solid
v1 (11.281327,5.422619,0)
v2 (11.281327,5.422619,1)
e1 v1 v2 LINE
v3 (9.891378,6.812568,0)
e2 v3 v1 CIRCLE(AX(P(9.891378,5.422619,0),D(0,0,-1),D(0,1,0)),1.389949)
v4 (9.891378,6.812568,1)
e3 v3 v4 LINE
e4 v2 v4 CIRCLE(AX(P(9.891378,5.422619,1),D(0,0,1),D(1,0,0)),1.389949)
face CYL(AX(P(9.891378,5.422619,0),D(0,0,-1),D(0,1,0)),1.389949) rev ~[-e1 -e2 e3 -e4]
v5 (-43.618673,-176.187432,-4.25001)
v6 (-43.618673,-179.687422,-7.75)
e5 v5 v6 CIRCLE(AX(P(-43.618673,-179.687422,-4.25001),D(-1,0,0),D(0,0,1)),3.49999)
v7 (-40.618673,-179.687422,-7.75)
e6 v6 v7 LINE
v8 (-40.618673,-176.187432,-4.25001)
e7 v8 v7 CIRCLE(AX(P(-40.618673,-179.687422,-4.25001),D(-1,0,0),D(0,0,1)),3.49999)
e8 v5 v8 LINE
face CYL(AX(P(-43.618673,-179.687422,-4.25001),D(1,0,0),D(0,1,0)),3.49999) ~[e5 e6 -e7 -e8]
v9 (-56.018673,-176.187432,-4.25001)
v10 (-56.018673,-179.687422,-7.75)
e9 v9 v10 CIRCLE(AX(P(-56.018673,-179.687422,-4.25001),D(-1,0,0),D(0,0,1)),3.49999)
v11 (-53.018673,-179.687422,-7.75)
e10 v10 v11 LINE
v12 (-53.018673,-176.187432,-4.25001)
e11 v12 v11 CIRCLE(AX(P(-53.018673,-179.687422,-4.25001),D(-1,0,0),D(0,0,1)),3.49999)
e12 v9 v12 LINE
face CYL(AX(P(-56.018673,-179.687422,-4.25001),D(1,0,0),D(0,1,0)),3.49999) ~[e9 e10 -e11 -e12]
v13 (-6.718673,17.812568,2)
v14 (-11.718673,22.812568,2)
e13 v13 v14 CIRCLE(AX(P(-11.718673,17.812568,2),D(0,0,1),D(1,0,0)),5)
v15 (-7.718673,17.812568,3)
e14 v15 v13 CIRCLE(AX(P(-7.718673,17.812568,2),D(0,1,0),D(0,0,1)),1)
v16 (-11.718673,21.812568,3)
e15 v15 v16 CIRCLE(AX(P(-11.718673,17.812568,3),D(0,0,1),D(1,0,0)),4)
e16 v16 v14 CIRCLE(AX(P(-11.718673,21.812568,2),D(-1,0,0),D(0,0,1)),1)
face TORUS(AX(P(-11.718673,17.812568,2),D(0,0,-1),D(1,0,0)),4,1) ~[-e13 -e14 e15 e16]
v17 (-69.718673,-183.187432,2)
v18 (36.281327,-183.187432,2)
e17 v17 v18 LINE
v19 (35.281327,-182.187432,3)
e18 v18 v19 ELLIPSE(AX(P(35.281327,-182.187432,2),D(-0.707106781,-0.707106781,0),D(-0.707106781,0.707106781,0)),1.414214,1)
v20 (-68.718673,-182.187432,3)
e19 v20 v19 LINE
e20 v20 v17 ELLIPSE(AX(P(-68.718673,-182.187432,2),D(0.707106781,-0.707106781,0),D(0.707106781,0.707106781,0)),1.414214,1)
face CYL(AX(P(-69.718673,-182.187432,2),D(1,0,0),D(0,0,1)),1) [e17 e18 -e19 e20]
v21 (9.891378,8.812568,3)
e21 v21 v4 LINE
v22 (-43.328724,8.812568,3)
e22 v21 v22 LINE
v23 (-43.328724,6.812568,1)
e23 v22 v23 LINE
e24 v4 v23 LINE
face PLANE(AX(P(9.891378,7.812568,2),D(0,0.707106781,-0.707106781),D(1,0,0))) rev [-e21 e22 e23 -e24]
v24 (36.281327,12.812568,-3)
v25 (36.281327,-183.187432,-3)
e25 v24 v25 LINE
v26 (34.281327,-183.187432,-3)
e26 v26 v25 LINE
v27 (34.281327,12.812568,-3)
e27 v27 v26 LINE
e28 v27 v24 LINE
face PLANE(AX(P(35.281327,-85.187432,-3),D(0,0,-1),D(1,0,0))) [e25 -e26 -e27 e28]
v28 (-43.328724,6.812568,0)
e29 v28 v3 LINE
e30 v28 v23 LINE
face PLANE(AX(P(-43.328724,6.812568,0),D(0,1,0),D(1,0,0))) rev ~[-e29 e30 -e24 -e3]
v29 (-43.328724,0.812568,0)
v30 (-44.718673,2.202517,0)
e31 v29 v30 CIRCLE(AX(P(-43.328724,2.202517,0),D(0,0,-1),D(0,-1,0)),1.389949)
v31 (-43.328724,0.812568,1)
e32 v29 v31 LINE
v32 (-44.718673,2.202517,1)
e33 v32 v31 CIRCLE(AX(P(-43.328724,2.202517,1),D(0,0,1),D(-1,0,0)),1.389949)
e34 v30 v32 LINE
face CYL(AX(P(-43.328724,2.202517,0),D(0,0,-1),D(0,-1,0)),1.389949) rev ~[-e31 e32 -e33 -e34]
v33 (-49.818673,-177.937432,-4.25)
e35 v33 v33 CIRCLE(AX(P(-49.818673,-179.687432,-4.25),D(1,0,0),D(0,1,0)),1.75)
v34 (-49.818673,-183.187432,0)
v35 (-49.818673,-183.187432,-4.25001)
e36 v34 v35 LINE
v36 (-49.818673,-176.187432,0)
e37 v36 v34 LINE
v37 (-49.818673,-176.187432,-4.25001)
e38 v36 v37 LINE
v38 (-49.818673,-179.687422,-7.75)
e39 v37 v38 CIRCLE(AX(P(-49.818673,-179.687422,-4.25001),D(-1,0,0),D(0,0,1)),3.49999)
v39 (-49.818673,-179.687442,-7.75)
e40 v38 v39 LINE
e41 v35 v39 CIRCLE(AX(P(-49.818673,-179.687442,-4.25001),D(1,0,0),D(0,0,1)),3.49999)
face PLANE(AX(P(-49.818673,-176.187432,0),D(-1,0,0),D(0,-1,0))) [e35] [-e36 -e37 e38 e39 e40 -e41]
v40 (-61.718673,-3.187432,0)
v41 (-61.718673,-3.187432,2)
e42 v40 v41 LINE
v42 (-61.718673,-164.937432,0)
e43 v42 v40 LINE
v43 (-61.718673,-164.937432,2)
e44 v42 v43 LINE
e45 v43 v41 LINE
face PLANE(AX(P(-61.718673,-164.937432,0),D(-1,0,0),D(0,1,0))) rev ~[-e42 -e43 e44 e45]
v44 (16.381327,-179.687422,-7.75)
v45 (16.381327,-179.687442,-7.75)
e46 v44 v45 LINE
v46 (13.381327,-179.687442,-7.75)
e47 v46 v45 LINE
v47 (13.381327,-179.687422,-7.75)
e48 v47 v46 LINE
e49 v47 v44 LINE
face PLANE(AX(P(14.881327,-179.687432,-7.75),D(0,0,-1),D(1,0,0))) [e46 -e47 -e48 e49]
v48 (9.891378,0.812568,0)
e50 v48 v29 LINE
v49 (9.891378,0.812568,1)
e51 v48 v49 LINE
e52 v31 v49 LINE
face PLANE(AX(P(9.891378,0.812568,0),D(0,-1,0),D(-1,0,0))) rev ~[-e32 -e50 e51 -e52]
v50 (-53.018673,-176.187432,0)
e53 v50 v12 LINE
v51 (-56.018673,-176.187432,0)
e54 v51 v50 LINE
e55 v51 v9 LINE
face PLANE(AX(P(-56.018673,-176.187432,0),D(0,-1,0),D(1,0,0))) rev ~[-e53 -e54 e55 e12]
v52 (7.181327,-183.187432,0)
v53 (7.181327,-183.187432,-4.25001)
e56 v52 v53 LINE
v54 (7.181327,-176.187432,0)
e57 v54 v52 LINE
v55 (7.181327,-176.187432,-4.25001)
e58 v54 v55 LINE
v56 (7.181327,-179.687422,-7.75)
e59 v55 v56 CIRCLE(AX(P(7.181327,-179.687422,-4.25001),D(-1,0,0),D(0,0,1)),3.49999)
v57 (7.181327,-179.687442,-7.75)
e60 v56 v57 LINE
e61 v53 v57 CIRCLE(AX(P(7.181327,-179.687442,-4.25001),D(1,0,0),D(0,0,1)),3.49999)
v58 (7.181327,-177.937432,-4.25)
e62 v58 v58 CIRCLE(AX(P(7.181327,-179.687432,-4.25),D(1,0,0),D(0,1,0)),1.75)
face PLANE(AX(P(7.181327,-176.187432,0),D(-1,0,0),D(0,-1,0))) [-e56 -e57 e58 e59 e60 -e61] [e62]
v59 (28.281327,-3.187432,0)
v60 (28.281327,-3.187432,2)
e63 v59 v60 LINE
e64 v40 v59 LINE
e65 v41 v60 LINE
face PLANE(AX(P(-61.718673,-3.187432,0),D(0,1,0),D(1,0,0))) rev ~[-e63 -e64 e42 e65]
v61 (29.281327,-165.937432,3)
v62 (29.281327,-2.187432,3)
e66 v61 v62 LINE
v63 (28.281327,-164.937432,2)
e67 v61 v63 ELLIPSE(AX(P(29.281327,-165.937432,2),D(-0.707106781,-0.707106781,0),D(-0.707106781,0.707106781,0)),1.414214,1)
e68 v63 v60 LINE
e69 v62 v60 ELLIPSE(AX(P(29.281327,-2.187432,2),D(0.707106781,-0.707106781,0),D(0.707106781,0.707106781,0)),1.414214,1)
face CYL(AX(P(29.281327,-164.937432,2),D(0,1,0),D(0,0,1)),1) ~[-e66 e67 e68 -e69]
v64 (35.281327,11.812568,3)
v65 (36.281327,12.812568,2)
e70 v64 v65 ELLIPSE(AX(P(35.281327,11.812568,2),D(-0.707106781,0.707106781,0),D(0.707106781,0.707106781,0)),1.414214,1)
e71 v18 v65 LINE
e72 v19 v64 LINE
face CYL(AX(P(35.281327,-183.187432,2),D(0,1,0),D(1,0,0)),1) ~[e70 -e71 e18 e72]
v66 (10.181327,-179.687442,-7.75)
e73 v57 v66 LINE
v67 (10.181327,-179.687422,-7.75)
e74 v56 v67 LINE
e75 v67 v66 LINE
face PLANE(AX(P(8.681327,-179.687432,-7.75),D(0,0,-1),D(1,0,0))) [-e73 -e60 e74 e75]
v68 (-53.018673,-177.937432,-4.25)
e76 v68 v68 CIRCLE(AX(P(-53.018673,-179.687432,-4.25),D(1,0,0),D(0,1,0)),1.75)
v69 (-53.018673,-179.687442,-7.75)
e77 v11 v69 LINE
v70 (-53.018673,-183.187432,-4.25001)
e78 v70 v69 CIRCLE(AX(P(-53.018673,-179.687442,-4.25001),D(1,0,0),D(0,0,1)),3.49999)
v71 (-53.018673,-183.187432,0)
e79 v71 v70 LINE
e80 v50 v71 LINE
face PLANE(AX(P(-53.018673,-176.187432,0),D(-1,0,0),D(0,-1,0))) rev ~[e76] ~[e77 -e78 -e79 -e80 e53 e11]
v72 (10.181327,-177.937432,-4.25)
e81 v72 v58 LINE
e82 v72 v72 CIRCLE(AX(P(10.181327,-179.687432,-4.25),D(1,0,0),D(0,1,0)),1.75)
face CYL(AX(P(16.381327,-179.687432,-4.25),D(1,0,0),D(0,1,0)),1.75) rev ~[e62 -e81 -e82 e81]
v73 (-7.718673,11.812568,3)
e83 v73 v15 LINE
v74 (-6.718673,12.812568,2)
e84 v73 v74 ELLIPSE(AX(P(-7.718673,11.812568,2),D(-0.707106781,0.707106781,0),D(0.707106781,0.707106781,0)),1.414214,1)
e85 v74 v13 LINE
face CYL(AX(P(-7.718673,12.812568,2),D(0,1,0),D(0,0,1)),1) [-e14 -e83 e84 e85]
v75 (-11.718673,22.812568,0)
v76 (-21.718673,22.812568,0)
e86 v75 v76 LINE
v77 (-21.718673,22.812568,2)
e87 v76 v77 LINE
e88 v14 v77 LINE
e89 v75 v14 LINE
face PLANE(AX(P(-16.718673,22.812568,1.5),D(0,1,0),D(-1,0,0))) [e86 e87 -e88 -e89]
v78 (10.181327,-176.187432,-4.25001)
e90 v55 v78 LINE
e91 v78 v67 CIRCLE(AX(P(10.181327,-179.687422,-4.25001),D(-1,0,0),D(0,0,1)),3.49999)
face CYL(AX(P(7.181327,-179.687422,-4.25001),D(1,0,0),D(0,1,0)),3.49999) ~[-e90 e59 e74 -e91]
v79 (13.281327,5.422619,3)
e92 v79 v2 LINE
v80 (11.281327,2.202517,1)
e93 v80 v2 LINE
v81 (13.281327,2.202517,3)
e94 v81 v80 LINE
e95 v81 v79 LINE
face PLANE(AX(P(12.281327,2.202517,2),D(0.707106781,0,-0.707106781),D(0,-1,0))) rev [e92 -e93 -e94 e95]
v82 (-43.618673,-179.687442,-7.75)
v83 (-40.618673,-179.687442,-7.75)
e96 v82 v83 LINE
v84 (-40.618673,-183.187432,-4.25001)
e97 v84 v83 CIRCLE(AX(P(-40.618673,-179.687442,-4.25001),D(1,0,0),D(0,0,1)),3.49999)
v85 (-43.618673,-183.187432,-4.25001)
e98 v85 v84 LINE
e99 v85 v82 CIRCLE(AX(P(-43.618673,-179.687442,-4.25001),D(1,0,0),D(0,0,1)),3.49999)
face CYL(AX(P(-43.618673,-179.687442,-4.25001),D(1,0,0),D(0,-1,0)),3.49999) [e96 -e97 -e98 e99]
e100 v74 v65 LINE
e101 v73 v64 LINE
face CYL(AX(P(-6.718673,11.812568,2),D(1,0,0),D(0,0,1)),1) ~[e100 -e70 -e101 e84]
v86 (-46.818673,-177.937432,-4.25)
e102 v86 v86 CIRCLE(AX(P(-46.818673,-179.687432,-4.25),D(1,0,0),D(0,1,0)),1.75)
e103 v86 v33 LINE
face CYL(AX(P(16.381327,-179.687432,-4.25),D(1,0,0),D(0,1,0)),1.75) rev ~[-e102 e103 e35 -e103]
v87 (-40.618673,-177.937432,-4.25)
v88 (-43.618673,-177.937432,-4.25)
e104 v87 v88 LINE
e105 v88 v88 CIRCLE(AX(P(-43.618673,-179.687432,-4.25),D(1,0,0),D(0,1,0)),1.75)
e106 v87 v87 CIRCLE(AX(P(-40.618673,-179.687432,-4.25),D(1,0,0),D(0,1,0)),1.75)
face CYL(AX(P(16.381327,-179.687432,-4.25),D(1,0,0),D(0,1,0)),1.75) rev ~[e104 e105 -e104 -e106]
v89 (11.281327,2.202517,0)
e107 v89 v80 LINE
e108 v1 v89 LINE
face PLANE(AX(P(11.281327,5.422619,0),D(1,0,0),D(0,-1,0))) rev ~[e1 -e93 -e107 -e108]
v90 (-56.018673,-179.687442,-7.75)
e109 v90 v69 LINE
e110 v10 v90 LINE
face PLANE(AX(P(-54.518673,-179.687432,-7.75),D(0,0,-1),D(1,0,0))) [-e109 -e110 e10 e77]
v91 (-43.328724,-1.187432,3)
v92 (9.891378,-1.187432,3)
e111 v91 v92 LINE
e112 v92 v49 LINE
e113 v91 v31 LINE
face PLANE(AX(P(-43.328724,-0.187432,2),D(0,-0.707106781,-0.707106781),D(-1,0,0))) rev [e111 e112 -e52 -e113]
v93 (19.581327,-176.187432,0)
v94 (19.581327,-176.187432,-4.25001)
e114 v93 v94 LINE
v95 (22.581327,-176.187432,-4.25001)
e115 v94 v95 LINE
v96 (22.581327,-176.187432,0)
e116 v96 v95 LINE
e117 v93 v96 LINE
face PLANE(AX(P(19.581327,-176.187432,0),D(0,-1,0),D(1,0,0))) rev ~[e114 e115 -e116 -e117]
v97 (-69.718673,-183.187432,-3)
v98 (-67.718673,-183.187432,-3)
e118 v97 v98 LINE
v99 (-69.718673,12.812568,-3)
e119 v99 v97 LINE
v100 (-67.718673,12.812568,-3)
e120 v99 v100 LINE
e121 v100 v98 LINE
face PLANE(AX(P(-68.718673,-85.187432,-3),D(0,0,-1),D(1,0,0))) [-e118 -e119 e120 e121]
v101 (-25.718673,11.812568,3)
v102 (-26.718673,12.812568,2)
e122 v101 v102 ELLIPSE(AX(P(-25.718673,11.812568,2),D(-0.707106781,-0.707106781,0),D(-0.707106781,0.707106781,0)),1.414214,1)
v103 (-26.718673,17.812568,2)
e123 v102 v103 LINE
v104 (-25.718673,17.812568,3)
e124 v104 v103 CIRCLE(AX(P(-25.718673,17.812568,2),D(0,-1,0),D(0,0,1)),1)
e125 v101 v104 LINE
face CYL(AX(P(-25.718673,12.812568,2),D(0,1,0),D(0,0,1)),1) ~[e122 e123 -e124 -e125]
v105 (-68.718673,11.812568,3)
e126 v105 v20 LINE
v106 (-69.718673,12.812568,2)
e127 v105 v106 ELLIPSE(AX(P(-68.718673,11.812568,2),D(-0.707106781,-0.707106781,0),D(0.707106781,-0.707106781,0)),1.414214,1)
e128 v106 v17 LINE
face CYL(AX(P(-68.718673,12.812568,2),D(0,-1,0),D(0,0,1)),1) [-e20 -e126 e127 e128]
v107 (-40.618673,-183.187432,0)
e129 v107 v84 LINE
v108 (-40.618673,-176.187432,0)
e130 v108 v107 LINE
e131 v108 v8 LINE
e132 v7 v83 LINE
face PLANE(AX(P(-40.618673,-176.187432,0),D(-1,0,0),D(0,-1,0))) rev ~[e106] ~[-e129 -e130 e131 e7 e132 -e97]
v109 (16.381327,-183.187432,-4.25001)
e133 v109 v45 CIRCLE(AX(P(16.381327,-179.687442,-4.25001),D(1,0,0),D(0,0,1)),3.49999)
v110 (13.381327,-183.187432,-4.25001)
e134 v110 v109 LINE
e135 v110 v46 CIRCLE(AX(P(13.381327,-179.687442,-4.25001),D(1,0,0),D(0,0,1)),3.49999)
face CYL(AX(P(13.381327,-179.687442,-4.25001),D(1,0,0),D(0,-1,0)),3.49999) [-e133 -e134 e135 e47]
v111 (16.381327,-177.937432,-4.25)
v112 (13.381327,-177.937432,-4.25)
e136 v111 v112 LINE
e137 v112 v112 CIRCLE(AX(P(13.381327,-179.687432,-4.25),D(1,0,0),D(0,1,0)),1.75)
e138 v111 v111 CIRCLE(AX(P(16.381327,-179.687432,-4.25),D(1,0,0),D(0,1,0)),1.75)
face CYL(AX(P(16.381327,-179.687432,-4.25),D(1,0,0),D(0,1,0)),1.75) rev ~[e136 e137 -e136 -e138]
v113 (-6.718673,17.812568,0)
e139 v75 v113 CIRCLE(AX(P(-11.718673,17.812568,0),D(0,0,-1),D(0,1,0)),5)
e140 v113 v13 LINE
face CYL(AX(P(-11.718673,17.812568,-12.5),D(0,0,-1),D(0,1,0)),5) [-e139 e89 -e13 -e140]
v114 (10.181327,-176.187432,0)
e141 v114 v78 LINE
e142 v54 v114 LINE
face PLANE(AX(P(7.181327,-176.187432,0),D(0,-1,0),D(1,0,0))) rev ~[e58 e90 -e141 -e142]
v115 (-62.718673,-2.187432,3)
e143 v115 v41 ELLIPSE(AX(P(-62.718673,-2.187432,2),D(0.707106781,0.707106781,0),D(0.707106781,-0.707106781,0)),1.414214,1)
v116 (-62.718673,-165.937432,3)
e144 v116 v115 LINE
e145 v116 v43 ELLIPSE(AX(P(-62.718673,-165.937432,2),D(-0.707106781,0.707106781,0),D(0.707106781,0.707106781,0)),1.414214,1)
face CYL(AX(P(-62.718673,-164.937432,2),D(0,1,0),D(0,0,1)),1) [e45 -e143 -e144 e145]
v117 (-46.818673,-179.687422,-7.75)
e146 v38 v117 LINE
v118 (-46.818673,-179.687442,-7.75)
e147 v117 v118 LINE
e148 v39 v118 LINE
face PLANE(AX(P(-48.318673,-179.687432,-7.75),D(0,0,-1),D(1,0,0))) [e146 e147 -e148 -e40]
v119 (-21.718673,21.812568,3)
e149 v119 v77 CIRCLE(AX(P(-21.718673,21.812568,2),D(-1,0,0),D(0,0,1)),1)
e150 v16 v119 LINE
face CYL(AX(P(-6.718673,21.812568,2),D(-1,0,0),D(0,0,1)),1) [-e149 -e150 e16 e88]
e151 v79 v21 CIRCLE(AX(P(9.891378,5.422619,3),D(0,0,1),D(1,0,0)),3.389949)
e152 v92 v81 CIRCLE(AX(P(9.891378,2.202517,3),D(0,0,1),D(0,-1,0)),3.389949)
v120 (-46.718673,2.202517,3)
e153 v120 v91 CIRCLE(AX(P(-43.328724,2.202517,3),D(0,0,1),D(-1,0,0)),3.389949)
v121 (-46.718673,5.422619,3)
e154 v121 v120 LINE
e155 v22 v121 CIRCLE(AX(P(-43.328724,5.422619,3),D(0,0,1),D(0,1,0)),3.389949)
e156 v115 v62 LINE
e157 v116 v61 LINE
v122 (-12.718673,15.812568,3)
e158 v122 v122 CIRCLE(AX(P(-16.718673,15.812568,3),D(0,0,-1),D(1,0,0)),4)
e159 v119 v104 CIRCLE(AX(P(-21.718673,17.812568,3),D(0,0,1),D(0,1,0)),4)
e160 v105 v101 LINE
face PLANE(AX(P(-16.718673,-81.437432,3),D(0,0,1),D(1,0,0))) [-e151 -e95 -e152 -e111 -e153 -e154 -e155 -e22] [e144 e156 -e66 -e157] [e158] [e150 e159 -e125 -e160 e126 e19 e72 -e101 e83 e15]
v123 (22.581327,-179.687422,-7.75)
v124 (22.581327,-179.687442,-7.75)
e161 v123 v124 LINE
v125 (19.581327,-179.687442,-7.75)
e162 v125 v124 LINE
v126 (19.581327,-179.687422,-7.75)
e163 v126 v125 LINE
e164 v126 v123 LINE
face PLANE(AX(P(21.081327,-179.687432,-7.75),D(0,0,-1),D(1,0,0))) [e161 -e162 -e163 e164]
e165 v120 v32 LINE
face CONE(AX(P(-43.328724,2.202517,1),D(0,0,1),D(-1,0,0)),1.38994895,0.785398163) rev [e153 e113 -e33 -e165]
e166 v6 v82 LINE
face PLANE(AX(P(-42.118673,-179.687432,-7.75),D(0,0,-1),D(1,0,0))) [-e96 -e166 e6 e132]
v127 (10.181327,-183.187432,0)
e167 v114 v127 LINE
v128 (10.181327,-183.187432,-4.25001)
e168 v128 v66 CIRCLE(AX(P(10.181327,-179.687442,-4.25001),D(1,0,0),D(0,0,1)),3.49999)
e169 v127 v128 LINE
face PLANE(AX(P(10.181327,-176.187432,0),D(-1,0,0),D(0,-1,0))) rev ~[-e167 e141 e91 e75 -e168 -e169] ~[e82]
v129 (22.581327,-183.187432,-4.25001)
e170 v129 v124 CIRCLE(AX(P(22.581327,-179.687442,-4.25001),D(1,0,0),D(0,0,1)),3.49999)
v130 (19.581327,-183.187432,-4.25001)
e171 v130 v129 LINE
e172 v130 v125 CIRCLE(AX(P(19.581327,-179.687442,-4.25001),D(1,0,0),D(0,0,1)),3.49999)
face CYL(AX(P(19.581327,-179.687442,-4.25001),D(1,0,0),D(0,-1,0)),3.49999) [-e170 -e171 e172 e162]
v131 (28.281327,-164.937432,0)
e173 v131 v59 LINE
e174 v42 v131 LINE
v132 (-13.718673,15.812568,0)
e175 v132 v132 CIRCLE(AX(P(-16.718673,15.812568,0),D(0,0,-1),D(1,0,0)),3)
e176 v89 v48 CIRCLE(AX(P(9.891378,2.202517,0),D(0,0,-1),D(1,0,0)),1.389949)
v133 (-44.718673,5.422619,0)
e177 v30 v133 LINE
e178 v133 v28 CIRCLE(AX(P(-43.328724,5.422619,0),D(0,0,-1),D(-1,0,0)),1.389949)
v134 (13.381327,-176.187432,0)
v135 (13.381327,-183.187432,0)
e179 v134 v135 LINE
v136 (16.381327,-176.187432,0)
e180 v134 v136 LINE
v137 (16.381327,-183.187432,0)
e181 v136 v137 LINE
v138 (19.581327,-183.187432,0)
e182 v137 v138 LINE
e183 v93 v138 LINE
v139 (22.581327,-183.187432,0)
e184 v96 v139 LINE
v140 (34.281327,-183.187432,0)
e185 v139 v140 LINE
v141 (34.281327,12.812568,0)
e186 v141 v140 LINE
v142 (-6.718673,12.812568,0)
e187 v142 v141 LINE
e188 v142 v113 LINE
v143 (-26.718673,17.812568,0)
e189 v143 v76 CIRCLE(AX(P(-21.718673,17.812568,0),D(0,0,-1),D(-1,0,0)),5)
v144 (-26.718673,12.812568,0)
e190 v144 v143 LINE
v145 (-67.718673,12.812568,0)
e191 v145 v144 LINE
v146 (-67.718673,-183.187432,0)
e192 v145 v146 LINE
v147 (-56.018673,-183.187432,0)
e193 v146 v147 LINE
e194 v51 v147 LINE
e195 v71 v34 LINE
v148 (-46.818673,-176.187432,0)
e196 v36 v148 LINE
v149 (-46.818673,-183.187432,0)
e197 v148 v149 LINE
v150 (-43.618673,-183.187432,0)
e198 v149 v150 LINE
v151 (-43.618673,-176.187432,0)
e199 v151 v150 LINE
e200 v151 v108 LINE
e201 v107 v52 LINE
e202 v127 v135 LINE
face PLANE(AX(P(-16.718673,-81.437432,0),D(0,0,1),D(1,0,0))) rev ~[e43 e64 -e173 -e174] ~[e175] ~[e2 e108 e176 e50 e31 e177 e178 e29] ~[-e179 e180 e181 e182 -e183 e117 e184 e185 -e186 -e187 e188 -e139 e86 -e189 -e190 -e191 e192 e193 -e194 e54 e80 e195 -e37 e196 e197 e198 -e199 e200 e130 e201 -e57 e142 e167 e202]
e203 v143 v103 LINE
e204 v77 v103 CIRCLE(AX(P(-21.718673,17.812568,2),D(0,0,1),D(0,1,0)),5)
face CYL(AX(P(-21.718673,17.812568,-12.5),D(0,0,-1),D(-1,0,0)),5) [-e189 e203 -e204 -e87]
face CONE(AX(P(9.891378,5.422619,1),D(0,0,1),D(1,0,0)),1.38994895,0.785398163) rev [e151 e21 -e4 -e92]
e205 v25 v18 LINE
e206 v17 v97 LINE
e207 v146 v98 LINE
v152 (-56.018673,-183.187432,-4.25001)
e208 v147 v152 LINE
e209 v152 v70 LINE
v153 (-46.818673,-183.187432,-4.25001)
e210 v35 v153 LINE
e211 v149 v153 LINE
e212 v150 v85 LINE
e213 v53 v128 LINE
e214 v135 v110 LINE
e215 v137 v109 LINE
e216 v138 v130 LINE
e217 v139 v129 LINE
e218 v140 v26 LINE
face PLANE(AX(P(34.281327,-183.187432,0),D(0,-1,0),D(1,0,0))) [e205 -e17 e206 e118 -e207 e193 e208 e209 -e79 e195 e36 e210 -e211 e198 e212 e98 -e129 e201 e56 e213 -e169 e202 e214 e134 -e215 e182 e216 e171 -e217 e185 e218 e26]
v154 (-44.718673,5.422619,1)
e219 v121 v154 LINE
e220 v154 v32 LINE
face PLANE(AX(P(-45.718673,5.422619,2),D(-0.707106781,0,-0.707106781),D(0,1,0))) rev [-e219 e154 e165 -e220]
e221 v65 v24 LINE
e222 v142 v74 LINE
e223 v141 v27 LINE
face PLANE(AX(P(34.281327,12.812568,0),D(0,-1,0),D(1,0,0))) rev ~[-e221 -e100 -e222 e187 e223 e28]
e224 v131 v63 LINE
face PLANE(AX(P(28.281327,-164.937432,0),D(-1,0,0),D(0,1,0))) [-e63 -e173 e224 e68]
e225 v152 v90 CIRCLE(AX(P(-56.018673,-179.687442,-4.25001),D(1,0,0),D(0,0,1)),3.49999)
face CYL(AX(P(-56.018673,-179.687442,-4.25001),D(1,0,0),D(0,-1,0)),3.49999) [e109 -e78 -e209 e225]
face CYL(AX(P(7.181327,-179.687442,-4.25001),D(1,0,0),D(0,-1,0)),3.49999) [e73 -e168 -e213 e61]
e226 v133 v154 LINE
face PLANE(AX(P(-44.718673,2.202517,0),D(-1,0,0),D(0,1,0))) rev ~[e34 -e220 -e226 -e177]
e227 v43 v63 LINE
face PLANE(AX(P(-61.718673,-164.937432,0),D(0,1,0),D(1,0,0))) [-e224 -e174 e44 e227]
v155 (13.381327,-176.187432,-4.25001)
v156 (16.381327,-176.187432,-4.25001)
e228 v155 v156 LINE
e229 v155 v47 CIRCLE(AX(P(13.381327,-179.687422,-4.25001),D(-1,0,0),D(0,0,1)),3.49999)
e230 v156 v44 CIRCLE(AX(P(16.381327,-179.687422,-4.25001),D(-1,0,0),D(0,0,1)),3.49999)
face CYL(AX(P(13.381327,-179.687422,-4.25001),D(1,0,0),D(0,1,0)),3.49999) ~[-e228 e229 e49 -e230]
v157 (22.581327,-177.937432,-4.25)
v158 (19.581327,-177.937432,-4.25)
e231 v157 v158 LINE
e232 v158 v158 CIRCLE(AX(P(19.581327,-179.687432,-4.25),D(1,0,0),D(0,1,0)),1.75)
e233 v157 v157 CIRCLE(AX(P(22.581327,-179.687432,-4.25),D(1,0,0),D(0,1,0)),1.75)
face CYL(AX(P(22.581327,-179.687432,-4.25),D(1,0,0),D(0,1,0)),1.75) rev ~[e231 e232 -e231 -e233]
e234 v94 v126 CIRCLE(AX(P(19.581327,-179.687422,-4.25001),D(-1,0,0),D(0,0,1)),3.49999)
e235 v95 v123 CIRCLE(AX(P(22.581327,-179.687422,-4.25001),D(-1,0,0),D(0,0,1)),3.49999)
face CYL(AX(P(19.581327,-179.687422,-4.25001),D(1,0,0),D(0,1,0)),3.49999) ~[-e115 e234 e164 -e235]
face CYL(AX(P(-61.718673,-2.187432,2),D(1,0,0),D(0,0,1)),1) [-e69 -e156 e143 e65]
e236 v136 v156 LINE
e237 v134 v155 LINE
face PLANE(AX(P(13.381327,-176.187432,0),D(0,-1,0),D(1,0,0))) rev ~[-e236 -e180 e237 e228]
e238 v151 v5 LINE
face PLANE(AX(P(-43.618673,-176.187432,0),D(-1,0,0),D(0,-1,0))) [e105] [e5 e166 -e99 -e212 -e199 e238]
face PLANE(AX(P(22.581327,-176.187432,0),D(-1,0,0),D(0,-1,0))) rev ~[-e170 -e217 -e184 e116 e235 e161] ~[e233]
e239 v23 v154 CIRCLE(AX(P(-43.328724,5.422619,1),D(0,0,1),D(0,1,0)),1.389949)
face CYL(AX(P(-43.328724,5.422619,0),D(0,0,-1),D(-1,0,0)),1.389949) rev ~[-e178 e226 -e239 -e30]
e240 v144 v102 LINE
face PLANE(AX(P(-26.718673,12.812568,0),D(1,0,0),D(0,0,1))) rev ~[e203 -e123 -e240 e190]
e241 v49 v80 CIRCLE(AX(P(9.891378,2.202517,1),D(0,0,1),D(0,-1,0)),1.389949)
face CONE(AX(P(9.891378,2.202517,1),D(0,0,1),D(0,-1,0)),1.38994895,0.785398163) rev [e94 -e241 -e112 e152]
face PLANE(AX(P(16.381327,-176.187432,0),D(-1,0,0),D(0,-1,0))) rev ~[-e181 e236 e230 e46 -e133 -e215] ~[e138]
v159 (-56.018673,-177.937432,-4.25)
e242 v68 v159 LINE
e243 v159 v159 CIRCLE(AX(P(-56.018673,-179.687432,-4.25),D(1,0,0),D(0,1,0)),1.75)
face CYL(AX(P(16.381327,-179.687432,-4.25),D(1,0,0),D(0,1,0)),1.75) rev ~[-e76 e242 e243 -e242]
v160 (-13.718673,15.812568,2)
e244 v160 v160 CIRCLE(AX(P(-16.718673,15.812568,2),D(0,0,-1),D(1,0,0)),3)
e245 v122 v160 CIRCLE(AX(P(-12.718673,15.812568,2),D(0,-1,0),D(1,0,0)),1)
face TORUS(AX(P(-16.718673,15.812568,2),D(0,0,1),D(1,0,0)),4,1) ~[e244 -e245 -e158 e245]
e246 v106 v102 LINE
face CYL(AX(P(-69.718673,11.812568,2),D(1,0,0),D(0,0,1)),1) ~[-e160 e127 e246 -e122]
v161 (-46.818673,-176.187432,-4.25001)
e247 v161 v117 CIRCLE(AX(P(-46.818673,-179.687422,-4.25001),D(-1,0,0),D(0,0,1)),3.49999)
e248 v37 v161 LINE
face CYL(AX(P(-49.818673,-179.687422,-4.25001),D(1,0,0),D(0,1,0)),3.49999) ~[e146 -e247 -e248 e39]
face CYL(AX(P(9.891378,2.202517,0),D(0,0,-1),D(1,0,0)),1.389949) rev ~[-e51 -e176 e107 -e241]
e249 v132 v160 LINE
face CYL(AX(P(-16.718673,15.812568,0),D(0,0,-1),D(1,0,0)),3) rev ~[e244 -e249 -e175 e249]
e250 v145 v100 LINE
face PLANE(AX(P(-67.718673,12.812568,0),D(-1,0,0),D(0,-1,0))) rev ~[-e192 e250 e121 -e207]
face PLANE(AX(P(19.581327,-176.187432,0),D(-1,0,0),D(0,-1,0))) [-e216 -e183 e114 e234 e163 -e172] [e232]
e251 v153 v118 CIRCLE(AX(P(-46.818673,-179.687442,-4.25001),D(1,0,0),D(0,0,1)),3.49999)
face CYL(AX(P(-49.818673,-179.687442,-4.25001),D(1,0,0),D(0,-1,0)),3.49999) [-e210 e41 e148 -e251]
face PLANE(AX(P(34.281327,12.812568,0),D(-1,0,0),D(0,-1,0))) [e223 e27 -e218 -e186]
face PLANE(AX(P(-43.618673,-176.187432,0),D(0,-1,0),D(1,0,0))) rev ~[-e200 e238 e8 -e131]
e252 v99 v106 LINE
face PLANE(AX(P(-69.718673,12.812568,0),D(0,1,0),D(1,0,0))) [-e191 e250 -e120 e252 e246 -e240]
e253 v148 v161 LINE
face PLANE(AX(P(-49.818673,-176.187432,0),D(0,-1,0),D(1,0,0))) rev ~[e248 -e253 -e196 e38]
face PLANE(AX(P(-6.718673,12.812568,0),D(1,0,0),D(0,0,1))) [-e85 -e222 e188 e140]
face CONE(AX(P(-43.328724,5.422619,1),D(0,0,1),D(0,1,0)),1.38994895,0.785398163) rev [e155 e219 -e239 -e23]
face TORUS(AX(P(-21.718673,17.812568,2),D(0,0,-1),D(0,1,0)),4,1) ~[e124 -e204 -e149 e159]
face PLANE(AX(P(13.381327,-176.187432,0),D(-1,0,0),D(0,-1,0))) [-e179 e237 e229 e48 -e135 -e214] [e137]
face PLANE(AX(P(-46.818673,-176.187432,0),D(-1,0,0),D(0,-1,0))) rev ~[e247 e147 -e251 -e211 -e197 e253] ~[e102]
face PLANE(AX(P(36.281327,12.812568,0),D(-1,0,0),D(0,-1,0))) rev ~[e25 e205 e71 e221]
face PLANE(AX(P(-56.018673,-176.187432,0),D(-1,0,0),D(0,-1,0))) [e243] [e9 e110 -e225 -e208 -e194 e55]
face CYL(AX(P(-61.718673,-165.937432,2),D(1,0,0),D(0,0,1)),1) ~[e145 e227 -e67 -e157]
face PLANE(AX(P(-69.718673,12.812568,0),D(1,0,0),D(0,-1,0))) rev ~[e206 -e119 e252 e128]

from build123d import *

# Parameters (mm, degrees)
F0_W         = 106
F0_H         = 188.5
F0_W_2       = 90
F0_H_2       = 161.75
F0_H_3       = 7.5
F1_DEPTH     = 3
F2_W         = 3
F2_H         = 7
F3_DEPTH     = 7.75
F4_R         = 3.49999
F5_R         = 1.75
F6_DEPTH     = 86.101
F7_W         = 20
F7_H         = 3
F8_DEPTH     = 10
F9_R         = 3
F10_DEPTH    = 3.001
F11_W        = 2
F11_H        = 196
F12_DEPTH    = 3
F13_R        = 1
F14_R        = 1.75
F15_DEPTH    = 25
F16_T1_DEPTH = 15.5
F16_T4_ANGLE = 90
F16_T6_ANGLE = 90
F18_DEPTH    = 3.0010001
F19_SIZE     = 2


# Not quite as in the source:
# - a fillet or chamfer that OpenCascade refuses, or shapes differently, is made with other operations: its cross-section is extruded or revolved along the edge and cut away or added
# - a fillet or chamfer is up to 0.001 mm smaller than in the source, because OpenCascade refuses the exact size


with BuildPart() as f1:
    # F0 (on Top) → F1 (new body)
    with BuildSketch(Plane.XY):
        with Locations((-16.7186730212, -81.4374315739)):
            Rectangle(F0_W, F0_H)
        with Locations((-16.7186730212, -84.0624315739)):
            Rectangle(F0_W_2, F0_H_2, mode=Mode.SUBTRACT)
        with Locations((-16.7186730212, -179.4374315739)):
            Rectangle(F0_W, F0_H_3)
    extrude(amount=F1_DEPTH)

    # F2 (on face) → F3 (join)
    with BuildSketch(Plane(origin=(0, 0, 0), x_dir=(1, 0, 0), z_dir=(0, 0, -1))):
        with Locations((-48.3186730212, 179.6874315739)):
            Rectangle(F2_W, F2_H)
        with Locations((14.8813269788, 179.6874315739)):
            Rectangle(F2_W, F2_H)
        with Locations((-54.5186730212, 179.6874315739)):
            Rectangle(F2_W, F2_H)
        with Locations((21.0813269788, 179.6874315739)):
            Rectangle(F2_W, F2_H)
        with Locations((-42.1186730212, 179.6874315739)):
            Rectangle(F2_W, F2_H)
        with Locations((8.6813269788, 179.6874315739)):
            Rectangle(F2_W, F2_H)
    extrude(amount=F3_DEPTH)

    # F4 (radius 3.5 in the source; OpenCascade refuses exactly that, so slightly less here)
    f4_edges = [f1.edges().sort_by_distance(p)[0] for p in [
        (-48.318673, -183.187432, -7.75),
        (-48.318673, -176.187432, -7.75),
        (14.881327, -183.187432, -7.75),
        (14.881327, -176.187432, -7.75),
        (-54.518673, -176.187432, -7.75),
        (-54.518673, -183.187432, -7.75),
        (-42.118673, -183.187432, -7.75),
        (-42.118673, -176.187432, -7.75),
        (21.081327, -176.187432, -7.75),
        (8.681327, -176.187432, -7.75),
        (8.681327, -183.187432, -7.75),
        (21.081327, -183.187432, -7.75),
    ]]
    fillet(f4_edges, radius=F4_R)

    # F5 (on face) → F6 (cut, through all)
    with BuildSketch(Plane.YZ.offset(16.3813269788)):
        with Locations((-179.6874315739, -4.25)):
            Circle(F5_R)
    extrude(amount=-F6_DEPTH, mode=Mode.SUBTRACT)

    # F7 (on face) → F8 (join)
    with BuildSketch(Plane(origin=(0, 12.8125684261, 0), x_dir=(-1, 0, 0), z_dir=(0, 1, 0))):
        with Locations((16.7186730212, 1.5)):
            Rectangle(F7_W, F7_H)
    extrude(amount=F8_DEPTH)

    # F9 (on face) → F10 (cut, through all)
    with BuildSketch(Plane(origin=(0, 0, 0), x_dir=(1, 0, 0), z_dir=(0, 0, -1))):
        with Locations((-16.7186730212, -15.8125684261)):
            Circle(F9_R)
    extrude(amount=-F10_DEPTH, mode=Mode.SUBTRACT)

    # F11 (on face) → F12 (join)
    with BuildSketch(Plane(origin=(0, 0, 0), x_dir=(1, 0, 0), z_dir=(0, 0, -1))):
        with Locations((35.2813269788, 85.1874315739)):
            Rectangle(F11_W, F11_H)
        with Locations((-68.7186730212, 85.1874315739)):
            Rectangle(F11_W, F11_H)
    extrude(amount=F12_DEPTH)

    # F13
    f13_edges = [f1.edges().sort_by_distance(p)[0] for p in [
        (14.781327, 12.812568, 3),
        (36.281327, -85.187432, 3),
        (-6.718673, 17.812568, 3),
        (-16.718673, -183.187432, 3),
        (-16.718673, 22.812568, 3),
        (-69.718673, -85.187432, 3),
        (-26.718673, 17.812568, 3),
        (-48.218673, 12.812568, 3),
        (-16.718673, -3.187432, 3),
        (-61.718673, -84.062432, 3),
        (28.281327, -84.062432, 3),
        (-16.718673, -164.937432, 3),
        (-19.718673, 15.812568, 3),
    ]]
    fillet(f13_edges, radius=F13_R)

    # F14 (on face) → F15 (cut)
    with BuildSketch(Plane.YZ.offset(22.5813269788)):
        with Locations((-179.6874315739, -4.25)):
            Circle(F14_R)
    extrude(amount=-F15_DEPTH, mode=Mode.SUBTRACT)

    # F16: fillet of radius 5 on 2 edges, made by hand

    # F16_s2 → F16_t1 (cut)
    with BuildSketch(Plane.XY.offset(-12.5)):
        with BuildLine():
            ThreePointArc((-11.7186730212, 22.8125684261), (-8.1831391152, 21.3481023321), (-6.7186730212, 17.8125684261))
            Line((-6.7186730212, 17.8125684261), (-6.7186730212, 22.8125684261))
            Line((-6.7186730212, 22.8125684261), (-11.7186730212, 22.8125684261))
        make_face()
        with BuildLine():
            ThreePointArc((-26.7186730212, 17.8125684261), (-25.2542069271, 21.3481023321), (-21.7186730212, 22.8125684261))
            Line((-21.7186730212, 22.8125684261), (-26.7186730212, 22.8125684261))
            Line((-26.7186730212, 22.8125684261), (-26.7186730212, 17.8125684261))
        make_face()
    extrude(amount=F16_T1_DEPTH, mode=Mode.SUBTRACT)

    # F16_s3 → F16_t4 (revolve, cut)
    with BuildSketch(Plane.YZ.offset(-21.7186730212)):
        with BuildLine():
            ThreePointArc((21.8125684261, 3), (22.5196752073, 2.7071067812), (22.8125684261, 2))
            Line((22.8125684261, 2), (22.8125684261, 3))
            Line((22.8125684261, 3), (21.8125684261, 3))
        make_face()
    revolve(axis=Axis((-21.7186730212, 17.8125684261, 3), (0, 0, 1)), revolution_arc=F16_T4_ANGLE, mode=Mode.SUBTRACT)

    # F16_s5 → F16_t6 (revolve, cut)
    with BuildSketch(Plane.XZ.offset(-17.8125684261)):
        with BuildLine():
            ThreePointArc((-7.7186730212, 3), (-7.01156624, 2.7071067812), (-6.7186730212, 2))
            Line((-6.7186730212, 2), (-6.7186730212, 3))
            Line((-6.7186730212, 3), (-7.7186730212, 3))
        make_face()
    revolve(axis=Axis((-11.7186730212, 17.8125684261, 3), (0, 0, 1)), revolution_arc=F16_T6_ANGLE, mode=Mode.SUBTRACT)

    # F17 (on face) → F18 (cut, through all)
    with BuildSketch(Plane(origin=(0, 0, 0), x_dir=(1, 0, 0), z_dir=(0, 0, -1))):
        with BuildLine():
            Line((9.8913780288, -0.8125684261), (-43.3287240711, -0.8125684261))
            ThreePointArc((-43.3287240711, -0.8125684261), (-44.3115663992, -1.2196750481), (-44.7186730212, -2.2025173761))
            Line((-44.7186730212, -2.2025173761), (-44.7186730212, -5.4226194761))
            ThreePointArc((-44.7186730212, -5.4226194761), (-44.3115663992, -6.4054618042), (-43.3287240711, -6.8125684261))
            Line((-43.3287240711, -6.8125684261), (9.8913780288, -6.8125684261))
            ThreePointArc((9.8913780288, -6.8125684261), (10.8742203569, -6.4054618042), (11.2813269788, -5.4226194761))
            Line((11.2813269788, -5.4226194761), (11.2813269788, -2.2025173761))
            ThreePointArc((11.2813269788, -2.2025173761), (10.8742203569, -1.2196750481), (9.8913780288, -0.8125684261))
        make_face()
    extrude(amount=-F18_DEPTH, mode=Mode.SUBTRACT)

    # F19
    f19_edges = [f1.edges().sort_by_distance(p)[0] for p in [
        (-16.718673, 6.812568, 3),
    ]]
    chamfer(f19_edges, length=F19_SIZE)


solid = f1.part
